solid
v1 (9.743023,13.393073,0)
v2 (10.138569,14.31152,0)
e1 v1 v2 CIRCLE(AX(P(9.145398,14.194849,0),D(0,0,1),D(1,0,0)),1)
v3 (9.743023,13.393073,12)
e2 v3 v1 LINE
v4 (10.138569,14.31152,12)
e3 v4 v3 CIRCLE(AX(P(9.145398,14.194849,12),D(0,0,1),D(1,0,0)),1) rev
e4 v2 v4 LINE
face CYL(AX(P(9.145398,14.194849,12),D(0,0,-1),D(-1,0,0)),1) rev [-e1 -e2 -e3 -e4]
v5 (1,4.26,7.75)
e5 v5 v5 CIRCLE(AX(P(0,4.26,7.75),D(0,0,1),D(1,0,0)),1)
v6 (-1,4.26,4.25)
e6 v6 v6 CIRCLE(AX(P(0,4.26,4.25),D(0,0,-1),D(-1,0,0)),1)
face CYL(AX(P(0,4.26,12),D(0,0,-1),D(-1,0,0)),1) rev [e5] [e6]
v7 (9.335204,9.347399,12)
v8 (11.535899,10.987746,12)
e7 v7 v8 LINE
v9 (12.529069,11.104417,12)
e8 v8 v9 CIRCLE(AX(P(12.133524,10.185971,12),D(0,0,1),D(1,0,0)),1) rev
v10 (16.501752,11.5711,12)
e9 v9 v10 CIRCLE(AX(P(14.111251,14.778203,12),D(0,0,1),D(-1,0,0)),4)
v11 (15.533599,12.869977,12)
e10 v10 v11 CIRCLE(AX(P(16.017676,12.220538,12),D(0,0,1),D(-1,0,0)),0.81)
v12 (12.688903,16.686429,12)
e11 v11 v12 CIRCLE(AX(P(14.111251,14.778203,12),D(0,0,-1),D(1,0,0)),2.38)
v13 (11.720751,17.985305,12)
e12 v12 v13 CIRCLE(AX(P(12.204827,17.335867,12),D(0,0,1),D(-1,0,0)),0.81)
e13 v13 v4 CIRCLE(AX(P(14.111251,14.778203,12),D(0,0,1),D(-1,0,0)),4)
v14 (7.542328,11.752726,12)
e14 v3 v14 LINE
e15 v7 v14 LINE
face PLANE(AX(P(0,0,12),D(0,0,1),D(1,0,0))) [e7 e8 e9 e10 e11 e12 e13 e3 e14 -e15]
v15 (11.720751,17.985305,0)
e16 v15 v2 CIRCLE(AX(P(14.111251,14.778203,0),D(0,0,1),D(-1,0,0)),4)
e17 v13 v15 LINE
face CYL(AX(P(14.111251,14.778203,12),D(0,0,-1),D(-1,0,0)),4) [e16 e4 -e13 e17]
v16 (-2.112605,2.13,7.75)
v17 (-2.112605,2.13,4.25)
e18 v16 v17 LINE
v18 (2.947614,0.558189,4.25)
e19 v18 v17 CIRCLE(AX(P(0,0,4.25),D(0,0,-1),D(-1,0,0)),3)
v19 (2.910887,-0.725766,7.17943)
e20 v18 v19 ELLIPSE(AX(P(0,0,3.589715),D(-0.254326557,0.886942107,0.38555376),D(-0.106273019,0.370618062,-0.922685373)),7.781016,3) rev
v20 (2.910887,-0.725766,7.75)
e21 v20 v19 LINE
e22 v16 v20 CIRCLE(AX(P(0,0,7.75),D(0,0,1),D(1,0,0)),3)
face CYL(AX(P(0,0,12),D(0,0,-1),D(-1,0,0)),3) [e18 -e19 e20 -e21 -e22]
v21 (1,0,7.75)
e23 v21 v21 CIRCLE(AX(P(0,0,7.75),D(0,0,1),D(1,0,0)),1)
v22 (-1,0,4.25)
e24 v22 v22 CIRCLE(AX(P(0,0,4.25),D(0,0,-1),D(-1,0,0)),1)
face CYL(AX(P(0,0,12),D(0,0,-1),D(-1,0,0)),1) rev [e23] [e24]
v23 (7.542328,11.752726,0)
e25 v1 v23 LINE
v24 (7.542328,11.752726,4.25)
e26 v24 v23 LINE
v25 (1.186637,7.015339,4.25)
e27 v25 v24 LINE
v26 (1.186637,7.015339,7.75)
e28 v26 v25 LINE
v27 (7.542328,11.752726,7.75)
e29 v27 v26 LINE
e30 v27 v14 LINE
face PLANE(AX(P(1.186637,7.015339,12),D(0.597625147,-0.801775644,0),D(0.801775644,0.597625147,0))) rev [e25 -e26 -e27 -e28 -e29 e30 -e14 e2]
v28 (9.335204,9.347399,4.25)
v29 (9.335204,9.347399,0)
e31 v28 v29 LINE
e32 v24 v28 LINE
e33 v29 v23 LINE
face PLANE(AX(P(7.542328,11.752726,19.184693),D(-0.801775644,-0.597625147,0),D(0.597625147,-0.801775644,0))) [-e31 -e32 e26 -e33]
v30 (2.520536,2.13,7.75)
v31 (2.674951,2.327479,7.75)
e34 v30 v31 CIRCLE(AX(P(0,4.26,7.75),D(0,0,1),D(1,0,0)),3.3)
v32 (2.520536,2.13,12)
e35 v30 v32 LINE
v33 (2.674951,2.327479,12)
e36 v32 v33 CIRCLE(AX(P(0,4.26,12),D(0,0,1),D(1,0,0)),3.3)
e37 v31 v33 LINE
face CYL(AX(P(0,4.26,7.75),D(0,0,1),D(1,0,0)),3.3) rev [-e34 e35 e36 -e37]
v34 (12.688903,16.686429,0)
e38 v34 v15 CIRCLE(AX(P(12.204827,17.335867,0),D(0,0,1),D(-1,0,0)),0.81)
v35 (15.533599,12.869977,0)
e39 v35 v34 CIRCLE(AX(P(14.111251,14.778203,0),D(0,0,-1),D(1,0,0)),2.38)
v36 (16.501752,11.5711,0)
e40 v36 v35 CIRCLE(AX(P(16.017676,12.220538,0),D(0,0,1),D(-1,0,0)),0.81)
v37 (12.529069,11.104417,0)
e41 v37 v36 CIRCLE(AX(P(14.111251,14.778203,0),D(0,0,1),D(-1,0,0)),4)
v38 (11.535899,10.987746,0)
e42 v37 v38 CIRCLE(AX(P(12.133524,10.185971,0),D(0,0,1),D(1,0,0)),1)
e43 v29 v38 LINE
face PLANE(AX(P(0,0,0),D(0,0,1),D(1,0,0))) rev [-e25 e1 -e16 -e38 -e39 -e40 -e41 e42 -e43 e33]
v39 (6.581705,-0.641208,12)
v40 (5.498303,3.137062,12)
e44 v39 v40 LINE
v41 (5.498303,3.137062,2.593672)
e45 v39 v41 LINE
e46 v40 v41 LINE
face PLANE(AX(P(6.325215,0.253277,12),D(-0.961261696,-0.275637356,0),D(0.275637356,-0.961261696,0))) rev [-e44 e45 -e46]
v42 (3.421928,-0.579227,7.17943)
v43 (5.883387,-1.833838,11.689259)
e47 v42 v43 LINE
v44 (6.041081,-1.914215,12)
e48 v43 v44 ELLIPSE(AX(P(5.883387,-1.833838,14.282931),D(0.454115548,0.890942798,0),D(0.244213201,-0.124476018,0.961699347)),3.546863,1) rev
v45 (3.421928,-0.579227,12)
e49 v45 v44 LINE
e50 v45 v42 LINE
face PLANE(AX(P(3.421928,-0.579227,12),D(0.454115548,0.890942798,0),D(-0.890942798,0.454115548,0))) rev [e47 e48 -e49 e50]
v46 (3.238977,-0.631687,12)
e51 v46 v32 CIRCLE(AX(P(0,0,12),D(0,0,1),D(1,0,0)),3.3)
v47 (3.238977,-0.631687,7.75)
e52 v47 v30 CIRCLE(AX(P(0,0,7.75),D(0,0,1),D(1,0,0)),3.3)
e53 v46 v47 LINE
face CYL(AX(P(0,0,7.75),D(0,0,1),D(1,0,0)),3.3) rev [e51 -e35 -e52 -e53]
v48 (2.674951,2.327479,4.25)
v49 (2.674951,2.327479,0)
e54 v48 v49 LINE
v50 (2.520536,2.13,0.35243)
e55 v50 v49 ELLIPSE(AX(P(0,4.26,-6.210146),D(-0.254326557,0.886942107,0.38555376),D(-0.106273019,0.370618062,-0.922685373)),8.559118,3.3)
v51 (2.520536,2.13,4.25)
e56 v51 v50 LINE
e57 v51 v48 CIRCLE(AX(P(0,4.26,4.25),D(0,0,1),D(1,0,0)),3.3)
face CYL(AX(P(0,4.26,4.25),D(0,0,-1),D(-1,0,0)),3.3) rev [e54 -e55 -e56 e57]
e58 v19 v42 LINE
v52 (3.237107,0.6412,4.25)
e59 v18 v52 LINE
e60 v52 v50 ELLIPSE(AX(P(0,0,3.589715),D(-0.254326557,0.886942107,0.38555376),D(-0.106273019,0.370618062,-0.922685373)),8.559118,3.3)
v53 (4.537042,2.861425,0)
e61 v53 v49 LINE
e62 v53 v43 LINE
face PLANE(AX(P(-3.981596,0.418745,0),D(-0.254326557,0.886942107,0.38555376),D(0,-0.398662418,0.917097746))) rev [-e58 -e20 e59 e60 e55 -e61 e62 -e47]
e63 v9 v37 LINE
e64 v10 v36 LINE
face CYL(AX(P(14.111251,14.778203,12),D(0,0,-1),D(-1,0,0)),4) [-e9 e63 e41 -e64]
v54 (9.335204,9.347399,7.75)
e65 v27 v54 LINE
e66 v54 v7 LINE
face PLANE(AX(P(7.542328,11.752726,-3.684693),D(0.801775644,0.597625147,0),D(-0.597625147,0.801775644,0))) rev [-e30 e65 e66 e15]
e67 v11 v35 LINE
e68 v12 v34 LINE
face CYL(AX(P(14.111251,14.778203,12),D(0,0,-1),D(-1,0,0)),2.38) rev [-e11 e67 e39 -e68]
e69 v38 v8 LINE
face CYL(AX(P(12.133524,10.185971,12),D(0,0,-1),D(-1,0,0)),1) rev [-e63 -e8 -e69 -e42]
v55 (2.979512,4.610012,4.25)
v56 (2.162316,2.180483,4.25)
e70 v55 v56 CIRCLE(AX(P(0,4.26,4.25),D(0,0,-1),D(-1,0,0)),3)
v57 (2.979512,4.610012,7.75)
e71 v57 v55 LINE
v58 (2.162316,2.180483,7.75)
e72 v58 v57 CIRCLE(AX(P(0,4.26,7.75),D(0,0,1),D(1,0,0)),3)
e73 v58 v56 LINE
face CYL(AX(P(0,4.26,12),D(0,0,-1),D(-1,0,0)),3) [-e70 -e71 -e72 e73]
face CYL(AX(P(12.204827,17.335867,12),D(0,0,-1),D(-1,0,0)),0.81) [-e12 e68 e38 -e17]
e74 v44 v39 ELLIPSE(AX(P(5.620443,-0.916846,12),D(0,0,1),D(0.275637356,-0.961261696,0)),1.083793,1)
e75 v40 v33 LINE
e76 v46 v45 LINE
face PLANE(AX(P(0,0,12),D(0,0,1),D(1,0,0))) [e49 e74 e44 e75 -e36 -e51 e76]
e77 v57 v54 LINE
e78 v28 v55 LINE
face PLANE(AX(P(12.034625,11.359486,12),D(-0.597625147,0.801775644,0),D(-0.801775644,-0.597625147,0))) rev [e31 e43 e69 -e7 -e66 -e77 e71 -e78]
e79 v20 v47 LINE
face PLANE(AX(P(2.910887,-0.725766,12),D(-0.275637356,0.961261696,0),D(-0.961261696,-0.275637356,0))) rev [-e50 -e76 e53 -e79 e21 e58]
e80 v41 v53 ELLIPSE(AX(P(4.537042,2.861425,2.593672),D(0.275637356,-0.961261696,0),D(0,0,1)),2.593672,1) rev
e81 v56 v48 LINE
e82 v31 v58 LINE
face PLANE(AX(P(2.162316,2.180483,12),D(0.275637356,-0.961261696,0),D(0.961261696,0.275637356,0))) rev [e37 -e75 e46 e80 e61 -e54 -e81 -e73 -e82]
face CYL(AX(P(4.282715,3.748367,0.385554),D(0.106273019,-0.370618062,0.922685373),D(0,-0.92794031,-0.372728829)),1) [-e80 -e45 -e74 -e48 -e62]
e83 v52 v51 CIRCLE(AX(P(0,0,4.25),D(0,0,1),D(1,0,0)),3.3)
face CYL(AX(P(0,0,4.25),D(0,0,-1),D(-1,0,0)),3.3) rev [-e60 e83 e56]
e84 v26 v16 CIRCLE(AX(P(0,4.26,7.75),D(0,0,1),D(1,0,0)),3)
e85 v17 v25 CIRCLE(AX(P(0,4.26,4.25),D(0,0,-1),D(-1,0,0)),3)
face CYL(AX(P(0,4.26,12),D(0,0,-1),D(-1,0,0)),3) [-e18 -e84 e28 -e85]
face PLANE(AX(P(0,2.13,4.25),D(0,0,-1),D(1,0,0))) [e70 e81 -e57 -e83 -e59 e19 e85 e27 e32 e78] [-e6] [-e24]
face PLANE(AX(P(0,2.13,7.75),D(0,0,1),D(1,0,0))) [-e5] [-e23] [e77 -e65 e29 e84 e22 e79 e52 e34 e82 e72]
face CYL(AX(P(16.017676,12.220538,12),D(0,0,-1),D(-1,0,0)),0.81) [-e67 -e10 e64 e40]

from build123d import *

# Parameters (mm, degrees)
SKETCH1_R            = 1
BOSS_EXTRUDE1_DEPTH  = 12
CUT_EXTRUDE1_DEPTH   = 4.25
CUT_EXTRUDE3_DEPTH   = 4.25
CUT_EXTRUDE2_START   = -3.551923789
CUT_EXTRUDE2_DEPTH   = 3.551923789
CUT_EXTRUDE2_START_2 = 4.25
CUT_EXTRUDE2_2_DEPTH = 3.5
FILLET8_R            = 1
FILLET9_R            = 1


with BuildPart() as part:
    # Sketch1 → Boss-Extrude1 (new body)
    with BuildSketch(Plane.XY):
        with BuildLine():
            Line((1.186636508, 7.015339144), (10.241749958, 13.764812698))
            ThreePointArc((10.241749958, 13.764812698), (10.336328118, 16.101061111), (11.720750751, 17.985305164))
            ThreePointArc((11.720750751, 17.985305164), (12.854265392, 17.819943261), (12.688903489, 16.68642862))
            ThreePointArc((12.688903489, 16.68642862), (12.203025305, 13.355854737), (15.533599188, 12.869976553))
            ThreePointArc((15.533599188, 12.869976553), (16.667113829, 12.704614651), (16.501751927, 11.57110001))
            ThreePointArc((16.501751927, 11.57110001), (14.300524873, 10.782683155), (12.034625399, 11.359485765))
            Line((12.034625399, 11.359485765), (2.979511949, 4.610012211))
            ThreePointArc((2.979511949, 4.610012211), (2.843457612, 3.303574986), (2.162315925, 2.180483268))
            Line((2.162315925, 2.180483268), (5.498303396, 3.137062282))
            Line((5.498303396, 3.137062282), (6.325215464, 0.253277194))
            Line((6.325215464, 0.253277194), (6.880438917, -1.683017096))
            Line((6.880438917, -1.683017096), (6.052988912, -1.920284566))
            Line((6.052988912, -1.920284566), (3.421928238, -0.579227021))
            Line((3.421928238, -0.579227021), (2.910887179, -0.725765687))
            ThreePointArc((2.910887179, -0.725765687), (-1.48262032, -2.608033164), (-2.112605027, 2.13))
            ThreePointArc((-2.112605027, 2.13), (-2.486159501, 5.938991047), (1.186636508, 7.015339144))
        make_face()
        with Locations((0, 4.26)):
            Circle(SKETCH1_R, mode=Mode.SUBTRACT)
        Circle(SKETCH1_R, mode=Mode.SUBTRACT)
    extrude(amount=BOSS_EXTRUDE1_DEPTH)

    # Sketch2 → Cut-Extrude1 (cut)
    with BuildSketch(Plane.XY.offset(12)):
        with BuildLine():
            ThreePointArc((2.520535657, 2.13), (0, 7.56), (-2.520535657, 2.13))
            ThreePointArc((-2.520535657, 2.13), (0, -3.3), (2.520535657, 2.13))
        make_face()
    cut_extrude1 = extrude(amount=-CUT_EXTRUDE1_DEPTH, mode=Mode.SUBTRACT)

    # Sketch4 → Cut-Extrude3 (cut)
    with BuildSketch(Plane.XY.offset(12)):
        Polygon((7.542328095, 11.752725651), (9.335203536, 9.347398719), (2.498013424, 4.251114272), (0.705137983, 6.656441205), align=None)
    cut_extrude3 = extrude(amount=-CUT_EXTRUDE3_DEPTH, mode=Mode.SUBTRACT)

    # Mirror1: Cut-Extrude1, Cut-Extrude3 across plane
    add(cut_extrude1.mirror(Plane.XY.offset(6)), mode=Mode.SUBTRACT)
    add(cut_extrude3.mirror(Plane.XY.offset(6)), mode=Mode.SUBTRACT)

    # Cut-Extrude2: read off the stored shape, not the designer's step
    # Cut-Extrude2 outline → Cut-Extrude2 (cut)
    with BuildSketch(Plane(origin=(5.91175943, 1.695169738, 0), x_dir=(0, 0, -1), z_dir=(0.9612616959383197, 0.27563735581699633, 0)).offset(CUT_EXTRUDE2_START)):
        Polygon((0, 1.5), (-12, -3.514325857), (0, -3.514325857), align=None)
    extrude(amount=CUT_EXTRUDE2_DEPTH, mode=Mode.SUBTRACT)

    # Cut-Extrude2 2 outline → Cut-Extrude2 2 (add)
    with BuildSketch(Plane.XY.offset(CUT_EXTRUDE2_START_2)):
        with BuildLine():
            ThreePointArc((2.910887178, -0.725765687), (2.998773461, -0.085777187), (2.947613523, 0.558188603))
            Line((2.947613523, 0.558188603), (2.674578173, 2))
            Line((2.674578173, 2), (2.129286445, 2))
            Line((2.129286445, 2), (2.573481441, 0.450907955))
            Line((2.573481441, 0.450907955), (2.910887178, -0.725765687))
        make_face()
    extrude(amount=CUT_EXTRUDE2_2_DEPTH)

    # Fillet8
    fillet8_edges = [part.edges().sort_by_distance(p)[0] for p in [
        (10.241749958, 13.764812698, 6),
        (12.034625399, 11.359485765, 6),
    ]]
    fillet(fillet8_edges, radius=FILLET8_R)

    # Fillet9
    fillet9_edges = [part.edges().sort_by_distance(p)[0] for p in [
        (6.189371157, 0.727022594, 6),
    ]]
    fillet(fillet9_edges, radius=FILLET9_R)


solid = part.part
